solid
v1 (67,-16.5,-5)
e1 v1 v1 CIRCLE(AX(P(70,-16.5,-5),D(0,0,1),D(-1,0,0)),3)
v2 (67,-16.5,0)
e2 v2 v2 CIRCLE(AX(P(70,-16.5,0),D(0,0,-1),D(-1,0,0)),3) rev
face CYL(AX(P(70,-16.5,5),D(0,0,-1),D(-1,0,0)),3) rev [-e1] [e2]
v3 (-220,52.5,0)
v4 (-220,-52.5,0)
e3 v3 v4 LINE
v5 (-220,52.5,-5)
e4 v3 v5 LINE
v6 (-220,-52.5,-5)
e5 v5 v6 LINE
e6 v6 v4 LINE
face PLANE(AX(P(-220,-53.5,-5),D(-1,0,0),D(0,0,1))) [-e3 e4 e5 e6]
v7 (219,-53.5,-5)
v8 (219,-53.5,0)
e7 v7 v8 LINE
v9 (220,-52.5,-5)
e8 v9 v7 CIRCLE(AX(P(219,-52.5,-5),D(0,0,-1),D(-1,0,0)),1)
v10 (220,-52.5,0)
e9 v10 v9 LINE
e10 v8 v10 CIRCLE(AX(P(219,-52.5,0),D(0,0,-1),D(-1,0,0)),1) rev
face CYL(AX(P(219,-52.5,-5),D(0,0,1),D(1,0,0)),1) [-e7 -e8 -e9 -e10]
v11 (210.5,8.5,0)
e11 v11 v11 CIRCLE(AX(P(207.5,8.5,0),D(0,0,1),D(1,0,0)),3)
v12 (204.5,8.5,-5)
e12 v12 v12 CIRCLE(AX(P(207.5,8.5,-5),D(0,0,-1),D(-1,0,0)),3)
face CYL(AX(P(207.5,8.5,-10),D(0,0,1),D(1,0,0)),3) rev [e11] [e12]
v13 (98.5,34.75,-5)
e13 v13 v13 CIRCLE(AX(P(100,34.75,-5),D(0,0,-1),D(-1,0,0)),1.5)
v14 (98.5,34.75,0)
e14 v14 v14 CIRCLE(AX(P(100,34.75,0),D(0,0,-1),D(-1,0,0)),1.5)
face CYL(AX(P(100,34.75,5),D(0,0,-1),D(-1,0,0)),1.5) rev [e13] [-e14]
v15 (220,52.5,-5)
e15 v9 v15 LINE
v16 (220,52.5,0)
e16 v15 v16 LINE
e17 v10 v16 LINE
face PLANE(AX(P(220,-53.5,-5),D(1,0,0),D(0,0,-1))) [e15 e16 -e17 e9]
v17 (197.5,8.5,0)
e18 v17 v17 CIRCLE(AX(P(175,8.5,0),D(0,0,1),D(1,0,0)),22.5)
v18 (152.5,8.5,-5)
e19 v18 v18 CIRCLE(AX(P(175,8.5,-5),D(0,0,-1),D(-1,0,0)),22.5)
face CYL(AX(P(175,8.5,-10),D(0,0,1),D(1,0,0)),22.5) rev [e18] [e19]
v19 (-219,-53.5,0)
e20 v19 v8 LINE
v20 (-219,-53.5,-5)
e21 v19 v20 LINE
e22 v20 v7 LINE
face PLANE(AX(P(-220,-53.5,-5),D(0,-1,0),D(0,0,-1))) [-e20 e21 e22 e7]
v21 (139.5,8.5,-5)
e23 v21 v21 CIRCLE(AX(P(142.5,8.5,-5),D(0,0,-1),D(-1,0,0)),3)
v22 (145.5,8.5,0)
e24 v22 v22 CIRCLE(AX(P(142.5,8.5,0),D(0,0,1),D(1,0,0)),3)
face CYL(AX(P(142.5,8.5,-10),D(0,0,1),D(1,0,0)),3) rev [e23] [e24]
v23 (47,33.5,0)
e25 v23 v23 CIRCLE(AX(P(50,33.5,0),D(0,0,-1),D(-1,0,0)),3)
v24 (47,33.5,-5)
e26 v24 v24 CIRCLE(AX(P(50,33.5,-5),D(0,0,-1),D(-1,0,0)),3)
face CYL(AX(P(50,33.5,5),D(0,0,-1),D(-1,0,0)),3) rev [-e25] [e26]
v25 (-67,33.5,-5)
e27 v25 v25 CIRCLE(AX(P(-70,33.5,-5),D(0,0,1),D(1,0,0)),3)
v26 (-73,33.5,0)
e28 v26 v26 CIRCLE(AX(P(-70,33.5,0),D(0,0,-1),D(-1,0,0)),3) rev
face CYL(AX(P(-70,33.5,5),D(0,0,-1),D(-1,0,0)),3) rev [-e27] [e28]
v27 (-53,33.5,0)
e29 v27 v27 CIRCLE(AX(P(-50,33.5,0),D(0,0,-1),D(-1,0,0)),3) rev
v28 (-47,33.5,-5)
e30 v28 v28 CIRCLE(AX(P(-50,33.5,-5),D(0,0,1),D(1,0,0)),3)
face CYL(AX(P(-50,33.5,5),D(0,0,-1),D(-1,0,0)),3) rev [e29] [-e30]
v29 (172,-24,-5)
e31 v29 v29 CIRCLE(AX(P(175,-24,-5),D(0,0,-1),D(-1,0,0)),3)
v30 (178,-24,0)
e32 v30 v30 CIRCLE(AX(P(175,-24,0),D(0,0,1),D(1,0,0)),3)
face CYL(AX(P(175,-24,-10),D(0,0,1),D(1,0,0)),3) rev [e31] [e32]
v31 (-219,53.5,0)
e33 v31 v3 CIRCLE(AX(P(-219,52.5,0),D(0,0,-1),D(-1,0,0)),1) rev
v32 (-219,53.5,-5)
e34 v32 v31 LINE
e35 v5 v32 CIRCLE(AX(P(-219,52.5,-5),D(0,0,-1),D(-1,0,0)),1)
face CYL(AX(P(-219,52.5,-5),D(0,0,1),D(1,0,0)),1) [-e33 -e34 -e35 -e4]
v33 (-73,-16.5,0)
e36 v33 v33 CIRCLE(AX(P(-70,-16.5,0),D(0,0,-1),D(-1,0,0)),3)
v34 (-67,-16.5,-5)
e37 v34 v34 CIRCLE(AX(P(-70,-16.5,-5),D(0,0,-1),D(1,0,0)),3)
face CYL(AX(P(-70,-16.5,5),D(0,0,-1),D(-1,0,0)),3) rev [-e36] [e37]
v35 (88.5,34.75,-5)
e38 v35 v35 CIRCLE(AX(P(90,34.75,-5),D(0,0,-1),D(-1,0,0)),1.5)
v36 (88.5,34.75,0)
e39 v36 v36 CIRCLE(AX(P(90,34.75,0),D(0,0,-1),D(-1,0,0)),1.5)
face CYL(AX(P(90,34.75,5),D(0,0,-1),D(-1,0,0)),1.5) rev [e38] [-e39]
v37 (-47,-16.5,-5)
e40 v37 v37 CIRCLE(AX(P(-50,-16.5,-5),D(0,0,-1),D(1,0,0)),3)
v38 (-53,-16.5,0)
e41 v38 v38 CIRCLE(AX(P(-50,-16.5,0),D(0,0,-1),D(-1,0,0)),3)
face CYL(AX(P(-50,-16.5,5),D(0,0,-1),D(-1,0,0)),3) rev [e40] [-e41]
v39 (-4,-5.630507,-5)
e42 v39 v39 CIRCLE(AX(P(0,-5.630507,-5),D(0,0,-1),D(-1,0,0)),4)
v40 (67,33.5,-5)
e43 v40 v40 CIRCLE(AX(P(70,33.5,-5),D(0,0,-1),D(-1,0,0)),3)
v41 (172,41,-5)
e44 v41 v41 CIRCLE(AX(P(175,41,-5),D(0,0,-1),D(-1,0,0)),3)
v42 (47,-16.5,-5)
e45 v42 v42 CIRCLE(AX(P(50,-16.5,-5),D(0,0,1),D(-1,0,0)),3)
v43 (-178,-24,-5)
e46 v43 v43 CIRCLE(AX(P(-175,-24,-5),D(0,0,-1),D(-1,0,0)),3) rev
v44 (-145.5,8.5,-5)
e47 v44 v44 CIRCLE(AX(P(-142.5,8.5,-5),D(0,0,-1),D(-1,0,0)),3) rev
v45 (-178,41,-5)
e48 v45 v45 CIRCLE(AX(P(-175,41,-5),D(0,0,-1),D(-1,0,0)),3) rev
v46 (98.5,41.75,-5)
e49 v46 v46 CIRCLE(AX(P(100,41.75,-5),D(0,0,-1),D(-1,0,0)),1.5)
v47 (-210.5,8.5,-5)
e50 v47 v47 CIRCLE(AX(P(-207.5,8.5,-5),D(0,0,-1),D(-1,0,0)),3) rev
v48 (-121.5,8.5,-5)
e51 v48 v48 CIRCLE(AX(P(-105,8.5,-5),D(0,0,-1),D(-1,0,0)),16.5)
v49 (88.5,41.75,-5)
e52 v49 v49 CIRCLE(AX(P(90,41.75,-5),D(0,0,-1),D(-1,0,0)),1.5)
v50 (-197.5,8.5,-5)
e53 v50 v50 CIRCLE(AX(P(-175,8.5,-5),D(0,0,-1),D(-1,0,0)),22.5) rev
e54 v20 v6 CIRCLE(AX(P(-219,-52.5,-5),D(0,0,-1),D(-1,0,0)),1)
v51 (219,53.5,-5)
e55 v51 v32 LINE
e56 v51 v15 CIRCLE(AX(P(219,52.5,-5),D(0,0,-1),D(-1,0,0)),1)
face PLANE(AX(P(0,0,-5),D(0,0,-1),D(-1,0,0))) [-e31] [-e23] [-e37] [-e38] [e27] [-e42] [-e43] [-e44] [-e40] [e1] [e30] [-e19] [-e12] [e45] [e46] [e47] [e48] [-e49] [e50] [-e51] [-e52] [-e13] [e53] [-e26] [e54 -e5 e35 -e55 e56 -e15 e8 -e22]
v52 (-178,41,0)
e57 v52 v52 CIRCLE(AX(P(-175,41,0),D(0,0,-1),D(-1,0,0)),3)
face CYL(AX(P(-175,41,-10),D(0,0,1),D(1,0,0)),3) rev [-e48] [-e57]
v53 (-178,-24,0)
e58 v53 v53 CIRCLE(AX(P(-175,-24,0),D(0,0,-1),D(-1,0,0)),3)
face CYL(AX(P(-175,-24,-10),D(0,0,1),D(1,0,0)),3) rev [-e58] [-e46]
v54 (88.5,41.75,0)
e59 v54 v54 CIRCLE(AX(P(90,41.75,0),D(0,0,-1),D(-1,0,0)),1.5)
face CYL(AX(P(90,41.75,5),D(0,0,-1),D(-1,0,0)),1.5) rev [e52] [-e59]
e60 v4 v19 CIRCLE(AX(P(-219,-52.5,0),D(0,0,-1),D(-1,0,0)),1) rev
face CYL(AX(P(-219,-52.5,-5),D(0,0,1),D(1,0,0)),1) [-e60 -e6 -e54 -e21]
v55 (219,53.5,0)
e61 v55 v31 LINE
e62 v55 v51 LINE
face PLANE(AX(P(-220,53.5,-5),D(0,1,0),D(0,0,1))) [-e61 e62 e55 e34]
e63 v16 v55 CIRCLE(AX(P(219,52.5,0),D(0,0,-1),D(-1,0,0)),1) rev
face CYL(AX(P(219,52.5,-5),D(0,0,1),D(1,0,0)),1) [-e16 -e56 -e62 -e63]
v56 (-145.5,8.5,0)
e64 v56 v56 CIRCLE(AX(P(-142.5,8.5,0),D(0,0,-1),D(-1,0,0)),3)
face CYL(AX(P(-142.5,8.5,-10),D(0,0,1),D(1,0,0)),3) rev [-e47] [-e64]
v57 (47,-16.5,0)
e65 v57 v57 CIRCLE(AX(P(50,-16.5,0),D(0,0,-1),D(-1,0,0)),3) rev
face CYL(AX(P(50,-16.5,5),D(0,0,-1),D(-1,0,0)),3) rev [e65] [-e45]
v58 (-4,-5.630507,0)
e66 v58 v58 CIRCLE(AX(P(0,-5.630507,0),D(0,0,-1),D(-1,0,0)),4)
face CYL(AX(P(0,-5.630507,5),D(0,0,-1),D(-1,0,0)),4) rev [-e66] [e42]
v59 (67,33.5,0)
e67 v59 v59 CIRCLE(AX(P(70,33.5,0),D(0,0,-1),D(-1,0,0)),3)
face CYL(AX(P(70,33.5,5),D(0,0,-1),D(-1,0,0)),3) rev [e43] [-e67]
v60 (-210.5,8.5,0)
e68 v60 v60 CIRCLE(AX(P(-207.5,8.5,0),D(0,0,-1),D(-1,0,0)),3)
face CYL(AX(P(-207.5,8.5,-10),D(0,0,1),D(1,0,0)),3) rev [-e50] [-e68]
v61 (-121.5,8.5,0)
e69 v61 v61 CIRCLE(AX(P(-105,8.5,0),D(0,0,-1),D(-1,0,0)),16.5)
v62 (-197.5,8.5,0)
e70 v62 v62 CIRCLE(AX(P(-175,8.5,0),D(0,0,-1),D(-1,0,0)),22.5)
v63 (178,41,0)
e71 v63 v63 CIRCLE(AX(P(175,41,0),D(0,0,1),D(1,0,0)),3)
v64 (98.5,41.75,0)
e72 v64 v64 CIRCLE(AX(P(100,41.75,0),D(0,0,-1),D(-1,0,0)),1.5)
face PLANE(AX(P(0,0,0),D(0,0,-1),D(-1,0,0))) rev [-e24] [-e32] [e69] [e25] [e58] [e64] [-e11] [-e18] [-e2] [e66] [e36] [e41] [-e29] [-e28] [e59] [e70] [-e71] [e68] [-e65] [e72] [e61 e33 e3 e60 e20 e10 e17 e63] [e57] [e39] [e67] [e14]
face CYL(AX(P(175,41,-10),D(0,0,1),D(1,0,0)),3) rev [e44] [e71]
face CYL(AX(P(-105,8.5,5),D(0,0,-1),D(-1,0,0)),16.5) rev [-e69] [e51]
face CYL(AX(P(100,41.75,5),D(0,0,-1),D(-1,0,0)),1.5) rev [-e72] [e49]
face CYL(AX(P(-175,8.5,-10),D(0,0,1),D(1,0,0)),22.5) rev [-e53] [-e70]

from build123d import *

# Parameters (mm, degrees)
SKETCH_1_W               = 440
SKETCH_1_H               = 107
SM_BASE_FLANGE_1_DEPTH   = 5
SKETCH_8_R               = 22.5
CUT_EXTRUDE_1_DEPTH      = 10
SKETCH_9_R               = 3
CUT_EXTRUDE_2_DEPTH      = 10
SKETCH_10_R              = 16.5
CUT_EXTRUDE_3_DEPTH      = 10
SKETCH_11_R              = 4
CUT_EXTRUDE_4_DEPTH      = 10
SKETCH_12_R              = 3
CUT_EXTRUDE_5_DEPTH      = 10
MIRROR_3_COPY_1_SKETCH_R = 3
MIRROR_3_COPY_1_DEPTH    = 10
FILLET_1_R               = 1
SKETCH_13_R              = 1.5
CUT_EXTRUDE_6_DEPTH      = 10


# Sheet-metal steps are written as plain solids
with BuildPart() as part:
    # Sketch 1 → 基体-法兰1 (new body)
    with BuildSketch(Plane.XY):
        Rectangle(SKETCH_1_W, SKETCH_1_H)
    extrude(amount=-SM_BASE_FLANGE_1_DEPTH)

    # 草图8 → 切除-拉伸1 (cut)
    with BuildSketch(Plane.XY):
        with Locations((175, 8.5)):
            Circle(SKETCH_8_R)
    cut_extrude_1 = extrude(amount=-CUT_EXTRUDE_1_DEPTH, mode=Mode.SUBTRACT)

    # 草图9 → 切除-拉伸2 (cut)
    with BuildSketch(Plane.XY):
        with Locations((175, 41)):
            Circle(SKETCH_9_R)
        with Locations((207.5, 8.5)):
            Circle(SKETCH_9_R)
        with Locations((175, -24)):
            Circle(SKETCH_9_R)
        with Locations((142.5, 8.5)):
            Circle(SKETCH_9_R)
    cut_extrude_2 = extrude(amount=-CUT_EXTRUDE_2_DEPTH, mode=Mode.SUBTRACT)

    # 镜向1: 切除-拉伸1, 切除-拉伸2 across plane
    add(cut_extrude_1.mirror(Plane(origin=(0, 0, 0), x_dir=(0, 0, 1), z_dir=(1, 0, 0))), mode=Mode.SUBTRACT)
    add(cut_extrude_2.mirror(Plane(origin=(0, 0, 0), x_dir=(0, 0, 1), z_dir=(1, 0, 0))), mode=Mode.SUBTRACT)

    # 草图10 → 切除-拉伸3 (cut)
    with BuildSketch(Plane(origin=(0, 0, -5), x_dir=(-1, 0, 0), z_dir=(0, 0, -1))):
        with Locations((105, 8.5)):
            Circle(SKETCH_10_R)
    extrude(amount=-CUT_EXTRUDE_3_DEPTH, mode=Mode.SUBTRACT)

    # 草图11 → 切除-拉伸4 (cut)
    with BuildSketch(Plane(origin=(0, 0, -5), x_dir=(-1, 0, 0), z_dir=(0, 0, -1))):
        with Locations((0, -5.630506542)):
            Circle(SKETCH_11_R)
    extrude(amount=-CUT_EXTRUDE_4_DEPTH, mode=Mode.SUBTRACT)

    # 草图12 → 切除-拉伸5 (cut)
    with BuildSketch(Plane(origin=(0, 0, -5), x_dir=(-1, 0, 0), z_dir=(0, 0, -1))):
        with Locations((-70, 33.5)):
            Circle(SKETCH_12_R)
        with Locations((-50, 33.5)):
            Circle(SKETCH_12_R)
    cut_extrude_5 = extrude(amount=-CUT_EXTRUDE_5_DEPTH, mode=Mode.SUBTRACT)

    # 镜向2: 切除-拉伸5 across plane
    add(cut_extrude_5.mirror(Plane(origin=(0, 0, 0), x_dir=(0, 0, 1), z_dir=(1, 0, 0))), mode=Mode.SUBTRACT)

    # 镜向3: 切除-拉伸5 across plane
    add(cut_extrude_5.mirror(Plane.ZX.offset(8.5)), mode=Mode.SUBTRACT)

    # 镜向3 copy 1 sketch → 镜向3 copy 1 (cut)
    with BuildSketch(Plane(origin=(0, 17, -5), x_dir=(1, 0, 0), z_dir=(0, 0, -1))):
        with Locations((-70, 33.5)):
            Circle(MIRROR_3_COPY_1_SKETCH_R)
        with Locations((-50, 33.5)):
            Circle(MIRROR_3_COPY_1_SKETCH_R)
    extrude(amount=-MIRROR_3_COPY_1_DEPTH, mode=Mode.SUBTRACT)

    # 圆角1
    fillet_1_edges = [part.edges().sort_by_distance(p)[0] for p in [
        (220, -53.5, -2.5),
        (-220, -53.5, -2.5),
        (-220, 53.5, -2.5),
        (220, 53.5, -2.5),
    ]]
    fillet(fillet_1_edges, radius=FILLET_1_R)

    # 草图13 → 切除-拉伸6 (cut)
    with BuildSketch(Plane(origin=(0, 0, -5), x_dir=(-1, 0, 0), z_dir=(0, 0, -1))):
        with Locations((-100, 41.75)):
            Circle(SKETCH_13_R)
        with Locations((-90, 41.75)):
            Circle(SKETCH_13_R)
        with Locations((-90, 34.75)):
            Circle(SKETCH_13_R)
        with Locations((-100, 34.75)):
            Circle(SKETCH_13_R)
    extrude(amount=-CUT_EXTRUDE_6_DEPTH, mode=Mode.SUBTRACT)


solid = part.part
